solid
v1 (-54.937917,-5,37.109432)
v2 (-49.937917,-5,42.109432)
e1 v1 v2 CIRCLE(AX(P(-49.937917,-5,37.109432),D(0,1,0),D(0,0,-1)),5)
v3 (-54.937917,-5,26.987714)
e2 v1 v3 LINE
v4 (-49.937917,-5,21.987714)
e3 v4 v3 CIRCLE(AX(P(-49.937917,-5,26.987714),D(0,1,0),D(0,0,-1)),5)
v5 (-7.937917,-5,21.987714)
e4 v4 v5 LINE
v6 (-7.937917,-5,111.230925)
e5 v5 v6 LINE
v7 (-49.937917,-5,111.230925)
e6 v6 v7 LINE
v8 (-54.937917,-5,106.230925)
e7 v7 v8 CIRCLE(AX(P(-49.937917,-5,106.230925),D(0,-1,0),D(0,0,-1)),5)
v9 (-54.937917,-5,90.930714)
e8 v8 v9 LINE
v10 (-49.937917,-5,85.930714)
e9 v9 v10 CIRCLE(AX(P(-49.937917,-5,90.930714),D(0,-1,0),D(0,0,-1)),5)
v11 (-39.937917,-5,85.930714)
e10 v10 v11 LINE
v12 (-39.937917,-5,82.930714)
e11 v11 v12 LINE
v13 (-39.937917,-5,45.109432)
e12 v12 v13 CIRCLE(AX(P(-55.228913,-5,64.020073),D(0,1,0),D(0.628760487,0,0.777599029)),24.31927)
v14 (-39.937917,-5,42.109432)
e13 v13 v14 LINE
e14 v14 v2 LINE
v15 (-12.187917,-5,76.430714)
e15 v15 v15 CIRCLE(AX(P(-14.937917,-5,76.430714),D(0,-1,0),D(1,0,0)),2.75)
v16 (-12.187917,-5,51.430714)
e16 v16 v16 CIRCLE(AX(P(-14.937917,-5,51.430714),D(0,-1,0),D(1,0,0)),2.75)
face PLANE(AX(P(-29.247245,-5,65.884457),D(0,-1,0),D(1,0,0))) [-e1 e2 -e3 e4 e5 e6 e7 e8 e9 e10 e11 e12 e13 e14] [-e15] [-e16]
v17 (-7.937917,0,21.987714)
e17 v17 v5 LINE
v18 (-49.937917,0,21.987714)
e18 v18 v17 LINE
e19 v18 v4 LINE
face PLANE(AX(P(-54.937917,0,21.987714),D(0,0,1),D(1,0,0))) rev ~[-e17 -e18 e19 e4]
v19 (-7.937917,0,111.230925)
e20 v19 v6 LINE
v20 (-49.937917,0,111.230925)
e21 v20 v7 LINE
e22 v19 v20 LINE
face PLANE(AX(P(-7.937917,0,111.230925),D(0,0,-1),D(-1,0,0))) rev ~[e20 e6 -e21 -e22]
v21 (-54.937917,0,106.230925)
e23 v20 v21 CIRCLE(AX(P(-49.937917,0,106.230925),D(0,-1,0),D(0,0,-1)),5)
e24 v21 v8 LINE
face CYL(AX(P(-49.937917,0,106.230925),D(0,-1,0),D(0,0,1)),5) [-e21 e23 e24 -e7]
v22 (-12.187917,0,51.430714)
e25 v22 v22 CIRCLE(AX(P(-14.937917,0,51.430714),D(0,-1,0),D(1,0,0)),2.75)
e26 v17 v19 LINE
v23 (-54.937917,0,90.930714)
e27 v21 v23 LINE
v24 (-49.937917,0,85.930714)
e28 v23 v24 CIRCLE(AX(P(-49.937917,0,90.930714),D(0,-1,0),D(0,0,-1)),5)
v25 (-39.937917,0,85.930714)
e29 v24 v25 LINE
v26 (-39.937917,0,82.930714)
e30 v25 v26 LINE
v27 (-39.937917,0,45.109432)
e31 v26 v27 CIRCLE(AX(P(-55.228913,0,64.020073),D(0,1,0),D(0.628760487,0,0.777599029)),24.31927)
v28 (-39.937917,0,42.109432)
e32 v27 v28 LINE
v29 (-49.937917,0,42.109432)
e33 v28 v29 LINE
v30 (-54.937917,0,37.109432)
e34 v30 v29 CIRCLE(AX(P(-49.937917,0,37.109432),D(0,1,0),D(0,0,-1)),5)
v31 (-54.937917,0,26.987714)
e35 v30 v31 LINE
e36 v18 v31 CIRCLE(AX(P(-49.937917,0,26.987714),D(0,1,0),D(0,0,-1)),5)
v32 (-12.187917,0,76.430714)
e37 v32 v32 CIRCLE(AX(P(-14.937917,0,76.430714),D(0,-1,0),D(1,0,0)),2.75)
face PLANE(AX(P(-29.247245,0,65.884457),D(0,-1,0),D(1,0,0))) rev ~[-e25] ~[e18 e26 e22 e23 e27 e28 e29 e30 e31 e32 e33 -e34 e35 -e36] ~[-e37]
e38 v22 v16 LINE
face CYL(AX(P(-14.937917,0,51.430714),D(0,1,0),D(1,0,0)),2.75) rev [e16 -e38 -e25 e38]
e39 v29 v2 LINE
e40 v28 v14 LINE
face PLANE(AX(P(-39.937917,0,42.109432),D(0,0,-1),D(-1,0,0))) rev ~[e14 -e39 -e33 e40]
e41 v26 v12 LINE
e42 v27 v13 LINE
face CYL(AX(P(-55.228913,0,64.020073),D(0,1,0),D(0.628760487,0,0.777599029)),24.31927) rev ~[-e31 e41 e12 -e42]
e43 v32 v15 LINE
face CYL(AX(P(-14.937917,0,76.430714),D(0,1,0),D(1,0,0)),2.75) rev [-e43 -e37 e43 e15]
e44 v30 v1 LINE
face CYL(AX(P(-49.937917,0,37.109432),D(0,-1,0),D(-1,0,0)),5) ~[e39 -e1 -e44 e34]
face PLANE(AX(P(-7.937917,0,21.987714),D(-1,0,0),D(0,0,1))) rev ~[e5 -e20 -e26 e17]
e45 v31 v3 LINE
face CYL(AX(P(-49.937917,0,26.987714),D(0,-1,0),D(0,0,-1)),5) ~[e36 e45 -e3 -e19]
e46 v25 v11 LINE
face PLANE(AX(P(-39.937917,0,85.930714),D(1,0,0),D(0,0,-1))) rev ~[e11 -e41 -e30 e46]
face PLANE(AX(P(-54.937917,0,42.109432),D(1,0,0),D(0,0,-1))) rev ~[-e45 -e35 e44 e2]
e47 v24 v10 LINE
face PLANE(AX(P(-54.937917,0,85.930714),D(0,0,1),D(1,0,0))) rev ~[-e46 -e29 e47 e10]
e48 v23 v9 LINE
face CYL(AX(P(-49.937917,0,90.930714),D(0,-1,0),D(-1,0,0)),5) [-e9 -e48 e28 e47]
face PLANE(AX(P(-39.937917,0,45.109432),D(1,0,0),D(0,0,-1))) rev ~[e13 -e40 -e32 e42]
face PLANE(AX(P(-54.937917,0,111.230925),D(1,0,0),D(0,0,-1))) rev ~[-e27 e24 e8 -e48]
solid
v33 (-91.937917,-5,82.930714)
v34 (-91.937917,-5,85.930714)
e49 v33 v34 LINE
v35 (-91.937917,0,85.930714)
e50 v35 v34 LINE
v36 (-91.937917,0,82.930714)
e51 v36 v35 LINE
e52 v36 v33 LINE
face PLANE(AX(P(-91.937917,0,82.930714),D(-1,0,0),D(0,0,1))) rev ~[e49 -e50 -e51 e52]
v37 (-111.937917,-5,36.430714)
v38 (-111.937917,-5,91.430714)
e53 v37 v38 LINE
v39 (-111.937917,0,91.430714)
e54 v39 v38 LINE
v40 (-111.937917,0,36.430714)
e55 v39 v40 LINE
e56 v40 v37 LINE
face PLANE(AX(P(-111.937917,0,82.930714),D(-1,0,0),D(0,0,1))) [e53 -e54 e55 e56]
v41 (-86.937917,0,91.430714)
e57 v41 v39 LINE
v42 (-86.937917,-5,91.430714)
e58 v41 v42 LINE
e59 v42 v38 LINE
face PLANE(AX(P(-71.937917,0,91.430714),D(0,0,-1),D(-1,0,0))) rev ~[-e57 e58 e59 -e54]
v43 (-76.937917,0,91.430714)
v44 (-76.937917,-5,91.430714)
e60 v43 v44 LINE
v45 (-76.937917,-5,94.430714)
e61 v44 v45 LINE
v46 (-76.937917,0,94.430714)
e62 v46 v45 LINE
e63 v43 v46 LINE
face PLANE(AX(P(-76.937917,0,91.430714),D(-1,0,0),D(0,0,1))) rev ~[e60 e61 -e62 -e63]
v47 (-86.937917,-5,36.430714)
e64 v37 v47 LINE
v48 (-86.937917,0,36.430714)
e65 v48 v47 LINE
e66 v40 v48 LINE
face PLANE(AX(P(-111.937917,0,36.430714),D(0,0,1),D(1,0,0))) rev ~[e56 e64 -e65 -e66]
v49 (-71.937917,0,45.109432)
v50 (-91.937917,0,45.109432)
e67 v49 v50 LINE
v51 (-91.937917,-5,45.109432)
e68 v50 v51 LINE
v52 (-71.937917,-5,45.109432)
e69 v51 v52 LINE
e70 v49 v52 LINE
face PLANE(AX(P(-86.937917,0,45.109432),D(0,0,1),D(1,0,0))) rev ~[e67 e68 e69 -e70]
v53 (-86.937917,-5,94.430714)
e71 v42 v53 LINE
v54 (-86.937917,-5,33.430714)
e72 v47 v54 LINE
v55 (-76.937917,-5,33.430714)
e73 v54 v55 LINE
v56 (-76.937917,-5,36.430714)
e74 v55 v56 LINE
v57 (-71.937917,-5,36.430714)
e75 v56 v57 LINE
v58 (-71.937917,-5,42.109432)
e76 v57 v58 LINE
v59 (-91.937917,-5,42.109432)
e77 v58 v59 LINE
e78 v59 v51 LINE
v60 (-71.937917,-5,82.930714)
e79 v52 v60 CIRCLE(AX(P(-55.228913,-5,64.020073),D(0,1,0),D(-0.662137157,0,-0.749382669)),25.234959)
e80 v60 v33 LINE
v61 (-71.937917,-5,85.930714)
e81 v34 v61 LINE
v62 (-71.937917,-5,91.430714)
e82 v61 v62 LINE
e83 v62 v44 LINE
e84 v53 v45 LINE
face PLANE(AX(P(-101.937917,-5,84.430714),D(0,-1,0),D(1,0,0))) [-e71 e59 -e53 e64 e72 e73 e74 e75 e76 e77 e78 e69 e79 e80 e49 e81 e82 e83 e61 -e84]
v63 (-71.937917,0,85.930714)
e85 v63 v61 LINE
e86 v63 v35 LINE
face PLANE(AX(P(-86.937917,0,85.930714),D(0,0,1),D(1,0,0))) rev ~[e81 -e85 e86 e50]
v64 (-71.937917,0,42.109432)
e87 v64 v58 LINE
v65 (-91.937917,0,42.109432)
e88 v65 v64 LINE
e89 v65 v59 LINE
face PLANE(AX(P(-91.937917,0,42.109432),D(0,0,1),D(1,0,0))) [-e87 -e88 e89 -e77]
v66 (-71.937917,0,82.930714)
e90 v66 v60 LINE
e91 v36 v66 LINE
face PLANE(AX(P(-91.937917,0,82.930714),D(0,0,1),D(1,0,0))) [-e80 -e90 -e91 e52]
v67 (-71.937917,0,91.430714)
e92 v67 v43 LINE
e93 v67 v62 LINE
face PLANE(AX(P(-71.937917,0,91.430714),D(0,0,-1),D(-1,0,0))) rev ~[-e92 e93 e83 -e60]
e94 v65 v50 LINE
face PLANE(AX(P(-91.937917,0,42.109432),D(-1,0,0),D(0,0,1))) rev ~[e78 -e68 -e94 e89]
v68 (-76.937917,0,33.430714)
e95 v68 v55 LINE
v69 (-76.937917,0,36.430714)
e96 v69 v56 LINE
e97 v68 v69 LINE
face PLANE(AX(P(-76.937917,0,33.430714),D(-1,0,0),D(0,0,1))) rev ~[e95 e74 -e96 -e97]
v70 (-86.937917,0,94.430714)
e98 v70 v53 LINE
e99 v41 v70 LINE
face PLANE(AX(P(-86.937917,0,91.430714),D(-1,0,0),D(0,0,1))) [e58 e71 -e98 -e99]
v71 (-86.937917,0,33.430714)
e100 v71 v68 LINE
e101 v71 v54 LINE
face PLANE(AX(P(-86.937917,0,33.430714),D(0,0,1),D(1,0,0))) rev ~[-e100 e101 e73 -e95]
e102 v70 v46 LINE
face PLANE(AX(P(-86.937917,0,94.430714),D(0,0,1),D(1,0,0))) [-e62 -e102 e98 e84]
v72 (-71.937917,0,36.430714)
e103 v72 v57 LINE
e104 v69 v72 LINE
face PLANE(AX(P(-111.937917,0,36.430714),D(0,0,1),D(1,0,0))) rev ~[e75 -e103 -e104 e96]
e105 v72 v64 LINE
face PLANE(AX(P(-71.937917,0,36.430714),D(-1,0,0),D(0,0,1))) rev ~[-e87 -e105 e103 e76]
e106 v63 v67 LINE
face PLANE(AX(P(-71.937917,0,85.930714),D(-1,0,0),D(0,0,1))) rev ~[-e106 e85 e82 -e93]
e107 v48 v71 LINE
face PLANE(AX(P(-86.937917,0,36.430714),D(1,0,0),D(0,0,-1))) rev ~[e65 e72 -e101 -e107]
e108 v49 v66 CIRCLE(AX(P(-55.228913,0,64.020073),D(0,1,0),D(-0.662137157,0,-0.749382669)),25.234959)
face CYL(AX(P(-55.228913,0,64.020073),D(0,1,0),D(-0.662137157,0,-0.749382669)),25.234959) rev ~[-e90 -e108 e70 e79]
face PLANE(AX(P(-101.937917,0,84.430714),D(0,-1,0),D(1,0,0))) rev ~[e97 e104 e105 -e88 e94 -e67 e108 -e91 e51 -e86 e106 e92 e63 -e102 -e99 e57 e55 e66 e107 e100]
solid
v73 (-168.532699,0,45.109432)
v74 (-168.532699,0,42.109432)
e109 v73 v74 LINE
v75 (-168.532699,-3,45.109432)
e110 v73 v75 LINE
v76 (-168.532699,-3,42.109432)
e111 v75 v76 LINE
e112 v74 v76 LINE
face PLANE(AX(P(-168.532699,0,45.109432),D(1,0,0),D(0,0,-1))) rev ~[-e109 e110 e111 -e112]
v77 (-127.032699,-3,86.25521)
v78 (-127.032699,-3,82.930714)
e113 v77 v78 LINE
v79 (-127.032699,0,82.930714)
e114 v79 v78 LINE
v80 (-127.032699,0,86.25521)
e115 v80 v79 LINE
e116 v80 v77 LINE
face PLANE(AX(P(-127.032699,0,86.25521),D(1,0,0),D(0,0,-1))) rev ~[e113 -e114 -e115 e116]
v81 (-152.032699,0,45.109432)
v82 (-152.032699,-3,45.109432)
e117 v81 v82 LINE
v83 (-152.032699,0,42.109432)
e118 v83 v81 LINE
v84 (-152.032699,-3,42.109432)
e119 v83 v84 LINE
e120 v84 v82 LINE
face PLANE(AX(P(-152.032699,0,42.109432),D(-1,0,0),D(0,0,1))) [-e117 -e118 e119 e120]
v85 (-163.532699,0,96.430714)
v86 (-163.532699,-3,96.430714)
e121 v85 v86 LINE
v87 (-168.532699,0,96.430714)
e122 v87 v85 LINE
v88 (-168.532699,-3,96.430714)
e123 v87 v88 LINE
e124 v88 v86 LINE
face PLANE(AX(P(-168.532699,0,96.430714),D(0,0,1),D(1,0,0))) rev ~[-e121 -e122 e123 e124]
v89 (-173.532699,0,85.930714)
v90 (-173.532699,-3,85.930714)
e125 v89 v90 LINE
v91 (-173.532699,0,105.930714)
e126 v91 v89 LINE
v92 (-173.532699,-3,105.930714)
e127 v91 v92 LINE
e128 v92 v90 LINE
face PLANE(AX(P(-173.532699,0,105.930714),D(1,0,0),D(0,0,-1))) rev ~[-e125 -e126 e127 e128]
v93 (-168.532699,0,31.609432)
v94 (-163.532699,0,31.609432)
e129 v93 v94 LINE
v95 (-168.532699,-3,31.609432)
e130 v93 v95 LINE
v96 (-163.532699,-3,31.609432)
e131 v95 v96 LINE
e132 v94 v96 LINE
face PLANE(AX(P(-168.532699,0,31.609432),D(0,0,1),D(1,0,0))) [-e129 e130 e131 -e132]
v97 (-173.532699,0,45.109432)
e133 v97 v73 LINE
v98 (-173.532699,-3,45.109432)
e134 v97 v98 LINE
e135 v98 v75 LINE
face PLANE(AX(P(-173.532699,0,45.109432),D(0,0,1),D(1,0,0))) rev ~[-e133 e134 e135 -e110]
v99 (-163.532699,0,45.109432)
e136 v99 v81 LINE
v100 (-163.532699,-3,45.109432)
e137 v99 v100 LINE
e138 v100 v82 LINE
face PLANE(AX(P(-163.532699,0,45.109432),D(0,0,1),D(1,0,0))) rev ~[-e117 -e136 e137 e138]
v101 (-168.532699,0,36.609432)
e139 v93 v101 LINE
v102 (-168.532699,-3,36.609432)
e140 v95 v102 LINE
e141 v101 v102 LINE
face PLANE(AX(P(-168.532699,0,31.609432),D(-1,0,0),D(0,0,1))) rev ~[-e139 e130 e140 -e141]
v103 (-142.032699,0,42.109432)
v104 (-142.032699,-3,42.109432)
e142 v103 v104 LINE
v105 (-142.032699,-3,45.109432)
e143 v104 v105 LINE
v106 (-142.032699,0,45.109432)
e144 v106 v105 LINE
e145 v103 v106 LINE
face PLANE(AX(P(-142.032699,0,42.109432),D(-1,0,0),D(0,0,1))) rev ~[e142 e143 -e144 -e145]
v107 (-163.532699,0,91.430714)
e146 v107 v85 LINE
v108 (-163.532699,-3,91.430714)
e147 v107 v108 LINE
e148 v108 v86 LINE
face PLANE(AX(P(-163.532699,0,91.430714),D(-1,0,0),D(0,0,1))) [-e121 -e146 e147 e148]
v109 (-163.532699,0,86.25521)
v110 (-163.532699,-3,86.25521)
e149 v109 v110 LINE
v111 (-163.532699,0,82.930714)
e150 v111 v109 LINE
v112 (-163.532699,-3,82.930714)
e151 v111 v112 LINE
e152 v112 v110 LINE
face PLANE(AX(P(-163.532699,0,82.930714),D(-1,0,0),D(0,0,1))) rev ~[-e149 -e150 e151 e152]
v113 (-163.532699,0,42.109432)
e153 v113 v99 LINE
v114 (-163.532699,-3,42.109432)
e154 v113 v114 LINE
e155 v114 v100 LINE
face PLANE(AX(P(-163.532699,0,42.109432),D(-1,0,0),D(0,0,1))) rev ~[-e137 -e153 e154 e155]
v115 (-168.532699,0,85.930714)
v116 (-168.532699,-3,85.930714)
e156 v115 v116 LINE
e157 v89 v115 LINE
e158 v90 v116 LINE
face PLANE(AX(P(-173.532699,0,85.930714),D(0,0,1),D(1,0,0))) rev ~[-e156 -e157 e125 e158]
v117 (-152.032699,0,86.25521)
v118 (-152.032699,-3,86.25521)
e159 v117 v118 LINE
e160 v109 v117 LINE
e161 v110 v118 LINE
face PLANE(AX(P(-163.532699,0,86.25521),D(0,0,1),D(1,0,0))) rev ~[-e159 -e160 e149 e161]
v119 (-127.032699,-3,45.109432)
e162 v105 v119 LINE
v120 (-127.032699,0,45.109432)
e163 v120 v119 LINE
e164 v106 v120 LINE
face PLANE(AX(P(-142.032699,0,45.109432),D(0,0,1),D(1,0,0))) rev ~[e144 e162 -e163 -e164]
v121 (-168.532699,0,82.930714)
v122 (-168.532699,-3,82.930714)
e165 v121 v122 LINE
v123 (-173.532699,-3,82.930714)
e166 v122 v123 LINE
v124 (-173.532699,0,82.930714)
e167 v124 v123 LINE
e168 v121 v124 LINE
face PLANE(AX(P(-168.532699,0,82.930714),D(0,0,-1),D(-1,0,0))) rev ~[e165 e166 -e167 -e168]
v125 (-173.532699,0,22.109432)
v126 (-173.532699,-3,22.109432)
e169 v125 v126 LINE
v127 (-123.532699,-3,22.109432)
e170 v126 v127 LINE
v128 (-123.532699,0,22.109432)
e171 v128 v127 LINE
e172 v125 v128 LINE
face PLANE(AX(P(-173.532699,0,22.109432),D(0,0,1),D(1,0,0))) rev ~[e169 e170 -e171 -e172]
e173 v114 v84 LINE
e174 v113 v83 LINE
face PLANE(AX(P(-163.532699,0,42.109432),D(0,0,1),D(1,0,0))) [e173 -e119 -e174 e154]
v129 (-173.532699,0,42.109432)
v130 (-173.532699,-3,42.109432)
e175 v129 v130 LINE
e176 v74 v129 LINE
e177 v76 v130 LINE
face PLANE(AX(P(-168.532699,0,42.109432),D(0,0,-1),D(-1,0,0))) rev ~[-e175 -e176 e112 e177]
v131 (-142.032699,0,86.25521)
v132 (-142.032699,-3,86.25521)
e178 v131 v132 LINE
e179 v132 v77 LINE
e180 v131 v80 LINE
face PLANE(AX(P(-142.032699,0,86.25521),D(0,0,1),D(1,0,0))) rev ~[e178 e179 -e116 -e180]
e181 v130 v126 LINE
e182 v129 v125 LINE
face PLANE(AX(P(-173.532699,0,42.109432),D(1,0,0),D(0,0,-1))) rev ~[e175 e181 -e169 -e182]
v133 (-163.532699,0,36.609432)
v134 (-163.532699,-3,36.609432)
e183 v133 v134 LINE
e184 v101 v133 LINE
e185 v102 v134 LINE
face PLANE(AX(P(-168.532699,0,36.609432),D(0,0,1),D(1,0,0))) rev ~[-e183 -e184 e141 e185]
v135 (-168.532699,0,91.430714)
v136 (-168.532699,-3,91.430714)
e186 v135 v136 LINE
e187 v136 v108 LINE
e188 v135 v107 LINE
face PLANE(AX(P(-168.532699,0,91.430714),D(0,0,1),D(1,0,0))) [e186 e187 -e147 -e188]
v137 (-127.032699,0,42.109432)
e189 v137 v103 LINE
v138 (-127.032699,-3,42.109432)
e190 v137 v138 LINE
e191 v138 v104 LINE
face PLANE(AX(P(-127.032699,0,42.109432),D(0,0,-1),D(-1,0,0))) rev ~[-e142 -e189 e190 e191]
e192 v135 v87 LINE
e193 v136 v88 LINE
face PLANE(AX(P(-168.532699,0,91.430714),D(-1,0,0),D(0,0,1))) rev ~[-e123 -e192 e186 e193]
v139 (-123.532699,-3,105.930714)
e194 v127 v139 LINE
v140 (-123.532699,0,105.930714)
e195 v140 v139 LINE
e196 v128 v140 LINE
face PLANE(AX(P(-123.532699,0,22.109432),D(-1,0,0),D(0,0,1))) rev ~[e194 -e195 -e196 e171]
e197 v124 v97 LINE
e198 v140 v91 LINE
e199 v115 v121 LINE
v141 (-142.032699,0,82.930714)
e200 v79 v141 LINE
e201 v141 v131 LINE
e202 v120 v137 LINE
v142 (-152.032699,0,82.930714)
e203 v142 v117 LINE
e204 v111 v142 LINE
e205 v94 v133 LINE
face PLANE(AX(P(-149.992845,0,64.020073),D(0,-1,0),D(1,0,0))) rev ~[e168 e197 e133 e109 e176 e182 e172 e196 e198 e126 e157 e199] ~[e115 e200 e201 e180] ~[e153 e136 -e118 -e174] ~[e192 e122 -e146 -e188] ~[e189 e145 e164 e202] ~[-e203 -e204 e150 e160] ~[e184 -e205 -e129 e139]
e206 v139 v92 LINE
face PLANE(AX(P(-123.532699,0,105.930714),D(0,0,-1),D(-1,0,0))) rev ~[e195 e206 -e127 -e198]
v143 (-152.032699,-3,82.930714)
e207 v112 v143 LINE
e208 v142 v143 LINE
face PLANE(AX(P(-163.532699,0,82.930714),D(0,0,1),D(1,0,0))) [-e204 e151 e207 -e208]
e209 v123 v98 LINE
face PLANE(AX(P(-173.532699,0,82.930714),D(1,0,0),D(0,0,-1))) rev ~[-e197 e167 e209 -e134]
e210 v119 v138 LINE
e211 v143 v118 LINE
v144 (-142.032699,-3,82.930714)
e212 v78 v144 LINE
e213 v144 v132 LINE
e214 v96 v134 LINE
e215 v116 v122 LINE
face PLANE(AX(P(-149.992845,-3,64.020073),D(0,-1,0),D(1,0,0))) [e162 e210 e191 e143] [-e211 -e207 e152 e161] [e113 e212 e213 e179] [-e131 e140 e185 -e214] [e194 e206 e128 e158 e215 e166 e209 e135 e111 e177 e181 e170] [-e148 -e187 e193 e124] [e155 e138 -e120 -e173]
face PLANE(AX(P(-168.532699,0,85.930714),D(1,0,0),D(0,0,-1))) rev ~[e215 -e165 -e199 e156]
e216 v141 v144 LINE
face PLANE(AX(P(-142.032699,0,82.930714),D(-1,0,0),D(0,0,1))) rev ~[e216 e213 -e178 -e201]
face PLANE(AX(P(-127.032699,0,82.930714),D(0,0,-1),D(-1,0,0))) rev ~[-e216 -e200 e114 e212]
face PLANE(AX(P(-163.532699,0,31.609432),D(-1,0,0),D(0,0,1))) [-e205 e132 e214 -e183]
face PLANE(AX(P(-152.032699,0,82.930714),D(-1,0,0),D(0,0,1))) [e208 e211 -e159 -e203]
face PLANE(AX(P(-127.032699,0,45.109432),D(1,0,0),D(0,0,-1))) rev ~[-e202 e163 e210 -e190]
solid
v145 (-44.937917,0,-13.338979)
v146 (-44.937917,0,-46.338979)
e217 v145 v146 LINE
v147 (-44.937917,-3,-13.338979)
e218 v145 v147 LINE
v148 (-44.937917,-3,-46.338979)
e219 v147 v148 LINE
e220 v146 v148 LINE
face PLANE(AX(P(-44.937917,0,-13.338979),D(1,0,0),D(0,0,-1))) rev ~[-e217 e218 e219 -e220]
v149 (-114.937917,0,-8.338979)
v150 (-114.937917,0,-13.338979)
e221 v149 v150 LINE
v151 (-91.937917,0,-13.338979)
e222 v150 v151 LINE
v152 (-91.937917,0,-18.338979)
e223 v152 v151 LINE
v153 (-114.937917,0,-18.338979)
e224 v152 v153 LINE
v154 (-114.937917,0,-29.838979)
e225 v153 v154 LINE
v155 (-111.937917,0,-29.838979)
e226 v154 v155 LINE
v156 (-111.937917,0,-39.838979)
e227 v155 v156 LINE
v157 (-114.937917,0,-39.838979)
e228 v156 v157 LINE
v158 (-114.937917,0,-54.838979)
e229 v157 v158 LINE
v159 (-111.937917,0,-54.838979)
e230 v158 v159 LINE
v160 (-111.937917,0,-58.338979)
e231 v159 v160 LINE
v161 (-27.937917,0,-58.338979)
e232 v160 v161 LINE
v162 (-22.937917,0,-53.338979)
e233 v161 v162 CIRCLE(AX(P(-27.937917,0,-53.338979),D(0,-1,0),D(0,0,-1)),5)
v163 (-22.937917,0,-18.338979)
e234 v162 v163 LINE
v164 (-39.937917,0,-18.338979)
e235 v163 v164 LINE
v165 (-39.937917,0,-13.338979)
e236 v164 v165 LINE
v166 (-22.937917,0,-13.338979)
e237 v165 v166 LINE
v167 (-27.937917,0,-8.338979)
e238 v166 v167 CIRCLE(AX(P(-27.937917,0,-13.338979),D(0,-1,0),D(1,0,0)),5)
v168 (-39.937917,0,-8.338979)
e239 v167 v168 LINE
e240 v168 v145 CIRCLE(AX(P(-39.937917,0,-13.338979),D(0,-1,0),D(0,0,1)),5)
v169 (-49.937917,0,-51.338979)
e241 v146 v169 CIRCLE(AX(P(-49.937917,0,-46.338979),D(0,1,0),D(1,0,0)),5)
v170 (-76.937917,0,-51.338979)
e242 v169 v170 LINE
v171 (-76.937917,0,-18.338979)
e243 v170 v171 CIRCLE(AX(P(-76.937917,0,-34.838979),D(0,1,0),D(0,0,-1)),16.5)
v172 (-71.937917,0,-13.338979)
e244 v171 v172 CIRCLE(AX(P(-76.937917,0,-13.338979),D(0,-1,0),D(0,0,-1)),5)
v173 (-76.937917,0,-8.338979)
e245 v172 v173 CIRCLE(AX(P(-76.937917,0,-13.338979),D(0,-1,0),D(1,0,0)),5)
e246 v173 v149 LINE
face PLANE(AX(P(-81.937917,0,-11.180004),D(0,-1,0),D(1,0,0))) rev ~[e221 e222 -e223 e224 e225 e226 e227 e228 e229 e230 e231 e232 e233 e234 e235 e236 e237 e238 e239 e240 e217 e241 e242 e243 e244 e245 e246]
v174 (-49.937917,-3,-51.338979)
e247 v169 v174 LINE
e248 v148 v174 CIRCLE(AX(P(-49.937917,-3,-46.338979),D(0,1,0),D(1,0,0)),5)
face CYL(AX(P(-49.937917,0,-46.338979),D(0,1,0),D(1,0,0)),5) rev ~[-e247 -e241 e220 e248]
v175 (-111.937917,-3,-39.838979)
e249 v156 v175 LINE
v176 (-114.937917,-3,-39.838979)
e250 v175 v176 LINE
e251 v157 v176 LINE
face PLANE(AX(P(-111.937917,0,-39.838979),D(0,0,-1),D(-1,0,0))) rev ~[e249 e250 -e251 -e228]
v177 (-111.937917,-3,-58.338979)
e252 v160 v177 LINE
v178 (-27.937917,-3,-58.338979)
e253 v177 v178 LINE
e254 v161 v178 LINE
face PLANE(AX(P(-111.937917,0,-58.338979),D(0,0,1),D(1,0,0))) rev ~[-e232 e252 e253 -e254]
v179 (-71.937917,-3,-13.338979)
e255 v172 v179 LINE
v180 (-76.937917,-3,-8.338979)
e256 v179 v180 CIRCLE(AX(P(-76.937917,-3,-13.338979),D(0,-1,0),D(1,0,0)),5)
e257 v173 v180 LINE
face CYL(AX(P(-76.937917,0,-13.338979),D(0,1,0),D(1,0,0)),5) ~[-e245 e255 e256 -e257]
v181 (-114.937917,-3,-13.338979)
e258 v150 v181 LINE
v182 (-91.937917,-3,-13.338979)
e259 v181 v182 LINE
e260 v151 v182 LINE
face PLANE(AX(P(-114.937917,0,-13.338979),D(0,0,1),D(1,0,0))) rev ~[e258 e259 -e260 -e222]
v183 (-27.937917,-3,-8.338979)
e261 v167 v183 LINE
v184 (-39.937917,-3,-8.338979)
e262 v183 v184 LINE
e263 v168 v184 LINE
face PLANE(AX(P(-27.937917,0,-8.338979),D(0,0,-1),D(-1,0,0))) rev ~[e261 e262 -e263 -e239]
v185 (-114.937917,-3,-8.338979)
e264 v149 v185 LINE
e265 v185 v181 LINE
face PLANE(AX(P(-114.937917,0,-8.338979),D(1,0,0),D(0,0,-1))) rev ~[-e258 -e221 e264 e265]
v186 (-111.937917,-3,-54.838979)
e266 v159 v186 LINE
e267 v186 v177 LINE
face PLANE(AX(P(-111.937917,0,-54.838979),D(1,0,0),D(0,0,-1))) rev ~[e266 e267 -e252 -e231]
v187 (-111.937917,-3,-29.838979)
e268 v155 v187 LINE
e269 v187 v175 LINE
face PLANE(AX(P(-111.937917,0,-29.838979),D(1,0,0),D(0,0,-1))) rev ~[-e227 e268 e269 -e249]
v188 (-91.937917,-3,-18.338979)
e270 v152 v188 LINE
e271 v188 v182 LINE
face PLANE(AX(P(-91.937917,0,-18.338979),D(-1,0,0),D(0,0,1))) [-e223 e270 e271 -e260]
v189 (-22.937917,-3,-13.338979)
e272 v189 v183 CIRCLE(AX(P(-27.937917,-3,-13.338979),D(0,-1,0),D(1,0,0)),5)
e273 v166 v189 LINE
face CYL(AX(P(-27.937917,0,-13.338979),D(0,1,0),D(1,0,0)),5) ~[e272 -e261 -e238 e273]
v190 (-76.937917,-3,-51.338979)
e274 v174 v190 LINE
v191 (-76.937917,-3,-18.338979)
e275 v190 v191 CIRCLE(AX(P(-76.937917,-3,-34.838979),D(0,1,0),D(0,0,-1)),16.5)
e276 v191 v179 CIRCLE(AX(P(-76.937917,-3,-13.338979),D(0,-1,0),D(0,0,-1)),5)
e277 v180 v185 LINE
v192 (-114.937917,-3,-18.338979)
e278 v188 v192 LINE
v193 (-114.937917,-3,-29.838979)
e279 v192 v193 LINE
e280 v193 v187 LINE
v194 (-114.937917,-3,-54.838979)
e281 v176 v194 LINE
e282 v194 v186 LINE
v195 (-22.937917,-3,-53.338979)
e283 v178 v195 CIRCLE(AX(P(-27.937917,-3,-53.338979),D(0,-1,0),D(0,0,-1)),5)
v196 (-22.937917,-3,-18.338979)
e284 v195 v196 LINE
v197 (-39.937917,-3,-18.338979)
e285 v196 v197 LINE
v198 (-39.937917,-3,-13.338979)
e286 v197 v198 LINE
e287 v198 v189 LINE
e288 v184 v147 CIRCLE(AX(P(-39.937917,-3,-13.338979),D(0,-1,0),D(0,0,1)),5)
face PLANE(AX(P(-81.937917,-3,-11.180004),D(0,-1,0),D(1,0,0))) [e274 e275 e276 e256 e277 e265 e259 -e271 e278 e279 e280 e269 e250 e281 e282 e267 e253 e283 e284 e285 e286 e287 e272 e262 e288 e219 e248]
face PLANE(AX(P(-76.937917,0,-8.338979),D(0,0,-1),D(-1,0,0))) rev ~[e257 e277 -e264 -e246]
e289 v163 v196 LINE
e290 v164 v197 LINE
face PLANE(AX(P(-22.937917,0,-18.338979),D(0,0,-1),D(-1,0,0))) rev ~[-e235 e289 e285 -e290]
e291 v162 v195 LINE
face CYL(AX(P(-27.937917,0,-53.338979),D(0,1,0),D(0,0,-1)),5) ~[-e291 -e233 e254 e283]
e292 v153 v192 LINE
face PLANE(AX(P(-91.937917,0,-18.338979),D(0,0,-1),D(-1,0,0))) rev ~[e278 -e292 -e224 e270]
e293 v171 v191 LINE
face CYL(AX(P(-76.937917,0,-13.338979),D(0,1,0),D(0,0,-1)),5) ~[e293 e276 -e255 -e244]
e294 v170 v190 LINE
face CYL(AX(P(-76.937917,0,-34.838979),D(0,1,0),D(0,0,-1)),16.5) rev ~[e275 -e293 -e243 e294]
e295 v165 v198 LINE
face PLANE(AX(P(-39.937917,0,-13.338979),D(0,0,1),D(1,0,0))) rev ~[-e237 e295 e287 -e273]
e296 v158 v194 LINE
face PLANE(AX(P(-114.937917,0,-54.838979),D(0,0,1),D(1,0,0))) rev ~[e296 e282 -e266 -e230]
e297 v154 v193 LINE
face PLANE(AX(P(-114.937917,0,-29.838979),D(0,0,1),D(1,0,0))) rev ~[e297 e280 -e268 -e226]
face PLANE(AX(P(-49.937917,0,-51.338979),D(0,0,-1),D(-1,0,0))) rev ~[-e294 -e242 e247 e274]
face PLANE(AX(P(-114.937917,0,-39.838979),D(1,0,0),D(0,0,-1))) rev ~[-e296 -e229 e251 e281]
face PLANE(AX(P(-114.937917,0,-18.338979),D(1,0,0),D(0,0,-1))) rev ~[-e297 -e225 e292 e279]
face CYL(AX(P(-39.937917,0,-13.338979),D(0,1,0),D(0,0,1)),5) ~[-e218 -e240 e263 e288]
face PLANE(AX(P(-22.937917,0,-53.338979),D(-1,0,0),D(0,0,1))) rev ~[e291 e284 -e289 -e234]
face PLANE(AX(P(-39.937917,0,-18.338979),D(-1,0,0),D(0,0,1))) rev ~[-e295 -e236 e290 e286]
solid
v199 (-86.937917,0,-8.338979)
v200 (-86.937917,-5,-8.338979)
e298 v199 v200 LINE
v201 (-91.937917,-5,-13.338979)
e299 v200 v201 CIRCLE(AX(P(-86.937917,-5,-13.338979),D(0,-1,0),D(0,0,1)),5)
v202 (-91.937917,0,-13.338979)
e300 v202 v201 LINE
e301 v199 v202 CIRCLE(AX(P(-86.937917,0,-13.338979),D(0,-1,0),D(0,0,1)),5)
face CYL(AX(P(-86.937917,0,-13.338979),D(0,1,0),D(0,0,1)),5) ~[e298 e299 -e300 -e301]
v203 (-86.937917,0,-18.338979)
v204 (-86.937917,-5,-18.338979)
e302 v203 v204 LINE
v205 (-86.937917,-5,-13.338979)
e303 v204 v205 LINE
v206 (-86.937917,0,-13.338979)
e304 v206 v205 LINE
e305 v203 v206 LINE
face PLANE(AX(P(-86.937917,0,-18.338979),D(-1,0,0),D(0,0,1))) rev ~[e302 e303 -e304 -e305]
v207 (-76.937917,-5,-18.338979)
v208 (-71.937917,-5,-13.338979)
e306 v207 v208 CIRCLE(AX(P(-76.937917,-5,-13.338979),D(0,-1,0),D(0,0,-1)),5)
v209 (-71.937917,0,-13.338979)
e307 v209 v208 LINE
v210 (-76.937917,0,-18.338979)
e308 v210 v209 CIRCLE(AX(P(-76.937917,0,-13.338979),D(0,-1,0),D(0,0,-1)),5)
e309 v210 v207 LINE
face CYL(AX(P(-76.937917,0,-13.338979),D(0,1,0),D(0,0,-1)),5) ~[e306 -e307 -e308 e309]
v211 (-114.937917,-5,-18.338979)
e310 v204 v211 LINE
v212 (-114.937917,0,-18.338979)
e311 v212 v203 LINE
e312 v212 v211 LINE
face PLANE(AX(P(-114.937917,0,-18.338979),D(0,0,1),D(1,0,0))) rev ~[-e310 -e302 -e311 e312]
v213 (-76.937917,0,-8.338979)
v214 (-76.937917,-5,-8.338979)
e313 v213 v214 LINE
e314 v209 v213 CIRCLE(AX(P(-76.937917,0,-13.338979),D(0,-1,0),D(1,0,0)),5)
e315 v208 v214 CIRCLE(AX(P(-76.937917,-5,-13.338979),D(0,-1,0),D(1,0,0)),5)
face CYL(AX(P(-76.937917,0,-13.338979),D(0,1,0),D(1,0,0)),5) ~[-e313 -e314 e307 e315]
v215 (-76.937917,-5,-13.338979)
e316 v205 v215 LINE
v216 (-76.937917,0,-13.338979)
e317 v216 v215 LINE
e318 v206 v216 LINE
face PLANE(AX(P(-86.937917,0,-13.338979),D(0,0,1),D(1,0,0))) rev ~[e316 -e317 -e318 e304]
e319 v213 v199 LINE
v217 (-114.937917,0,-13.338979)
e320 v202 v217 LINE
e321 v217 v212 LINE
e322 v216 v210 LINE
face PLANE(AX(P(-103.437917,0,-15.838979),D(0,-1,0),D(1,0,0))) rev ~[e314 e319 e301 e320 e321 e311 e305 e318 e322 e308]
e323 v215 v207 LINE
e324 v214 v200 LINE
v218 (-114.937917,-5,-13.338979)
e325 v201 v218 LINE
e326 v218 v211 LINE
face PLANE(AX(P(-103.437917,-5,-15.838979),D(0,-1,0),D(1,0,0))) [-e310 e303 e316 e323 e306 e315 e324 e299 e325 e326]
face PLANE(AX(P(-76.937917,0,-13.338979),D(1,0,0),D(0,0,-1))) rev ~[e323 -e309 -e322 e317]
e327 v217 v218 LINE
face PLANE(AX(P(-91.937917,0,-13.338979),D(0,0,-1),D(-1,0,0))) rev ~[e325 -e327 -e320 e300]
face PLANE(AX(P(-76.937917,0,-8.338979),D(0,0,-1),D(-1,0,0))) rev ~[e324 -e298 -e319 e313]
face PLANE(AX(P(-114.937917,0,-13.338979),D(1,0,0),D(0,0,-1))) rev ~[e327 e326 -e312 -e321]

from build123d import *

# Parameters (mm, degrees)
F0_W     = 10
F0_H     = 5
F0_W_2   = 5
F1_DEPTH = 3
F0_W_3   = 11.5
F0_H_2   = 3
F0_H_3   = 3.3244964182
F2_DEPTH = 3
F0_R     = 2.75
F0_W_4   = 17
F0_H_4   = 5.5
F0_H_5   = 5.6787184179
F3_DEPTH = 5
F4_DEPTH = 5
F5_DEPTH = 5
F0_W_5   = 20
F6_DEPTH = 5
F7_DEPTH = 5
F8_R     = 5


with BuildPart() as f1:
    # F0 (on Front) → F1 (new body)
    with BuildSketch(Plane.XZ):
        with BuildLine():
            Line((-76.9379170388, -8.3389794454), (-86.9379170388, -8.3389794454))
            ThreePointArc((-86.9379170388, -8.3389794454), (-90.4734509447, -9.8034455395), (-91.9379170388, -13.3389794454))
            Line((-91.9379170388, -13.3389794454), (-86.9379170388, -13.3389794454))
            Line((-86.9379170388, -13.3389794454), (-76.9379170388, -13.3389794454))
            Line((-76.9379170388, -13.3389794454), (-71.9379170388, -13.3389794454))
            ThreePointArc((-71.9379170388, -13.3389794454), (-73.4023831329, -9.8034455395), (-76.9379170388, -8.3389794454))
        make_face()
        with BuildLine():
            ThreePointArc((-91.9379170388, -13.3389794454), (-90.4734509447, -9.8034455395), (-86.9379170388, -8.3389794454))
            Line((-86.9379170388, -8.3389794454), (-114.9379170388, -8.3389794454))
            Line((-114.9379170388, -8.3389794454), (-114.9379170388, -13.3389794454))
            Line((-114.9379170388, -13.3389794454), (-91.9379170388, -13.3389794454))
        make_face()
        with Locations((-81.9379170388, -15.8389794454)):
            Rectangle(F0_W, F0_H)
        with BuildLine():
            Line((-86.9379170388, -18.3389794454), (-91.9379170388, -18.3389794454))
            Line((-91.9379170388, -18.3389794454), (-111.9379170388, -18.3389794454))
            Line((-111.9379170388, -18.3389794454), (-114.9379170388, -18.3389794454))
            Line((-114.9379170388, -18.3389794454), (-114.9379170388, -29.8389794454))
            Line((-114.9379170388, -29.8389794454), (-111.9379170388, -29.8389794454))
            Line((-111.9379170388, -29.8389794454), (-111.9379170388, -34.8389794454))
            Line((-111.9379170388, -34.8389794454), (-111.9379170388, -39.8389794454))
            Line((-111.9379170388, -39.8389794454), (-114.9379170388, -39.8389794454))
            Line((-114.9379170388, -39.8389794454), (-114.9379170388, -54.8389794454))
            Line((-114.9379170388, -54.8389794454), (-111.9379170388, -54.8389794454))
            Line((-111.9379170388, -54.8389794454), (-111.9379170388, -58.3389794454))
            Line((-111.9379170388, -58.3389794454), (-27.9379170388, -58.3389794454))
            ThreePointArc((-27.9379170388, -58.3389794454), (-24.4023831329, -56.8745133513), (-22.9379170388, -53.3389794454))
            Line((-22.9379170388, -53.3389794454), (-22.9379170388, -18.3389794454))
            Line((-22.9379170388, -18.3389794454), (-39.9379170388, -18.3389794454))
            Line((-39.9379170388, -18.3389794454), (-39.9379170388, -13.3389794454))
            Line((-39.9379170388, -13.3389794454), (-22.9379170388, -13.3389794454))
            ThreePointArc((-22.9379170388, -13.3389794454), (-24.4023831329, -9.8034455395), (-27.9379170388, -8.3389794454))
            Line((-27.9379170388, -8.3389794454), (-39.9379170388, -8.3389794454))
            ThreePointArc((-39.9379170388, -8.3389794454), (-43.4734509447, -9.8034455395), (-44.9379170388, -13.3389794454))
            Line((-44.9379170388, -13.3389794454), (-44.9379170388, -46.3389794454))
            ThreePointArc((-44.9379170388, -46.3389794454), (-46.4023831329, -49.8745133513), (-49.9379170388, -51.3389794454))
            Line((-49.9379170388, -51.3389794454), (-66.9379170388, -51.3389794454))
            Line((-66.9379170388, -51.3389794454), (-76.9379170388, -51.3389794454))
            ThreePointArc((-76.9379170388, -51.3389794454), (-93.4379170388, -34.8389794454), (-76.9379170388, -18.3389794454))
            Line((-76.9379170388, -18.3389794454), (-86.9379170388, -18.3389794454))
        make_face()
        with BuildLine():
            ThreePointArc((-76.9379170388, -18.3389794454), (-73.4023831329, -16.8745133513), (-71.9379170388, -13.3389794454))
            Line((-71.9379170388, -13.3389794454), (-76.9379170388, -13.3389794454))
            Line((-76.9379170388, -13.3389794454), (-76.9379170388, -18.3389794454))
        make_face()
        with Locations((-89.4379170388, -15.8389794454)):
            Rectangle(F0_W_2, F0_H)
    extrude(amount=F1_DEPTH)


with BuildPart() as f2:
    # F0 (on Front) → F2 (new body)
    with BuildSketch(Plane.XZ):
        Polygon((-123.5326989889, 42.1094321907), (-123.5326989889, 105.9307137728), (-172.0326989889, 105.9307137728), (-173.5326989889, 105.9307137728), (-173.5326989889, 85.9307137728), (-172.0326989889, 85.9307137728), (-168.5326989889, 85.9307137728), (-168.5326989889, 82.9307137728), (-172.0326989889, 82.9307137728), (-173.5326989889, 82.9307137728), (-173.5326989889, 45.1094321907), (-172.0326989889, 45.1094321907), (-168.5326989889, 45.1094321907), (-168.5326989889, 42.1094321907), (-172.0326989889, 42.1094321907), (-173.5326989889, 42.1094321907), (-173.5326989889, 22.1094321907), (-172.0326989889, 22.1094321907), (-125.9478926659, 22.1094321907), (-123.5326989889, 22.1094321907), align=None)
        with Locations((-166.0326989889, 34.1094321907)):
            Rectangle(F0_W_2, F0_H, mode=Mode.SUBTRACT)
        with Locations((-157.7826989889, 43.6094321907)):
            Rectangle(F0_W_3, F0_H_2, mode=Mode.SUBTRACT)
        Polygon((-127.0326989889, 42.1094321907), (-142.0326989889, 42.1094321907), (-142.0326989889, 45.1094321907), (-130.5326989889, 45.1094321907), (-127.0326989889, 45.1094321907), align=None, mode=Mode.SUBTRACT)
        with Locations((-157.7826989889, 84.5929619819)):
            Rectangle(F0_W_3, F0_H_3, mode=Mode.SUBTRACT)
        Polygon((-142.0326989889, 86.255210191), (-127.0326989889, 86.255210191), (-127.0326989889, 82.9307137728), (-130.5326989889, 82.9307137728), (-142.0326989889, 82.9307137728), align=None, mode=Mode.SUBTRACT)
        with Locations((-166.0326989889, 93.9307137728)):
            Rectangle(F0_W_2, F0_H, mode=Mode.SUBTRACT)
    extrude(amount=F2_DEPTH)


with BuildPart() as f3:
    # F0 (on Front) → F3 (new body)
    with BuildSketch(Plane.XZ):
        with BuildLine():
            Line((-7.9379170388, 31.4307137728), (-7.9379170388, 96.4307137728))
            Line((-7.9379170388, 96.4307137728), (-7.9379170388, 111.2309247255))
            Line((-7.9379170388, 111.2309247255), (-22.9379170388, 111.2309247255))
            Line((-22.9379170388, 111.2309247255), (-54.9379170388, 111.2309247255))
            Line((-54.9379170388, 111.2309247255), (-54.9379170388, 91.4307137728))
            Line((-54.9379170388, 91.4307137728), (-39.9379170388, 91.4307137728))
            Line((-39.9379170388, 91.4307137728), (-22.9379170388, 91.4307137728))
            Line((-22.9379170388, 91.4307137728), (-22.9379170388, 85.9307137728))
            Line((-22.9379170388, 85.9307137728), (-22.9379170388, 82.9307137728))
            Line((-22.9379170388, 82.9307137728), (-39.9379170388, 82.9307137728))
            ThreePointArc((-39.9379170388, 82.9307137728), (-30.9096430701, 64.0200729817), (-39.9379170388, 45.1094321907))
            Line((-39.9379170388, 45.1094321907), (-22.9379170388, 45.1094321907))
            Line((-22.9379170388, 45.1094321907), (-22.9379170388, 42.1094321907))
            Line((-22.9379170388, 42.1094321907), (-22.9379170388, 36.4307137728))
            Line((-22.9379170388, 36.4307137728), (-39.9379170388, 36.4307137728))
            Line((-39.9379170388, 36.4307137728), (-54.9379170388, 36.4307137728))
            Line((-54.9379170388, 36.4307137728), (-54.9379170388, 21.9877138734))
            Line((-54.9379170388, 21.9877138734), (-22.9379170388, 21.9877138734))
            Line((-22.9379170388, 21.9877138734), (-7.9379170388, 21.9877138734))
            Line((-7.9379170388, 21.9877138734), (-7.9379170388, 31.4307137728))
        make_face()
        with Locations((-14.9379170388, 51.4307137728)):
            Circle(F0_R, mode=Mode.SUBTRACT)
        with Locations((-14.9379170388, 76.4307137728)):
            Circle(F0_R, mode=Mode.SUBTRACT)
        with Locations((-31.4379170388, 84.4307137728)):
            Rectangle(F0_W_4, F0_H_2)
        with Locations((-31.4379170388, 88.6807137728)):
            Rectangle(F0_W_4, F0_H_4)
        Polygon((-39.9379170388, 91.4307137728), (-54.9379170388, 91.4307137728), (-54.9379170388, 85.9307137728), (-44.9379170388, 85.9307137728), (-39.9379170388, 85.9307137728), align=None)
        with Locations((-31.4379170388, 43.6094321907)):
            Rectangle(F0_W_4, F0_H_2)
        with Locations((-31.4379170388, 39.2700729817)):
            Rectangle(F0_W_4, F0_H_5)
        Polygon((-54.9379170388, 42.1094321907), (-54.9379170388, 36.4307137728), (-39.9379170388, 36.4307137728), (-39.9379170388, 42.1094321907), (-44.9379170388, 42.1094321907), align=None)
    extrude(amount=F3_DEPTH)

    # F8
    f8_edges = [f3.edges().sort_by_distance(p)[0] for p in [
        (-54.937917, -2.5, 42.109432),
        (-54.937917, -2.5, 85.930714),
        (-54.937917, -2.5, 21.987714),
        (-54.937917, -2.5, 111.230925),
    ]]
    fillet(f8_edges, radius=F8_R)


with BuildPart() as f4:
    # F0 (on Front) → F4 (new body)
    with BuildSketch(Plane.XZ):
        Polygon((-86.9379170388, 85.9307137728), (-71.9379170388, 85.9307137728), (-71.9379170388, 91.4307137728), (-76.9379170388, 91.4307137728), (-86.9379170388, 91.4307137728), (-91.9379170388, 91.4307137728), (-111.9379170388, 91.4307137728), (-111.9379170388, 85.9307137728), (-91.9379170388, 85.9307137728), align=None)
        Polygon((-71.9379170388, 36.4307137728), (-71.9379170388, 42.1094321907), (-86.9379170388, 42.1094321907), (-91.9379170388, 42.1094321907), (-111.9379170388, 42.1094321907), (-111.9379170388, 36.4307137728), (-86.9379170388, 36.4307137728), (-76.9379170388, 36.4307137728), align=None)
        with Locations((-89.4379170388, 84.4307137728)):
            Rectangle(F0_W_2, F0_H_2)
        with BuildLine():
            ThreePointArc((-71.9379170388, 45.1094321907), (-80.4638719585, 64.0200729817), (-71.9379170388, 82.9307137728))
            Line((-71.9379170388, 82.9307137728), (-86.9379170388, 82.9307137728))
            Line((-86.9379170388, 82.9307137728), (-91.9379170388, 82.9307137728))
            Line((-91.9379170388, 82.9307137728), (-111.9379170388, 82.9307137728))
            Line((-111.9379170388, 82.9307137728), (-111.9379170388, 80.9307137728))
            Line((-111.9379170388, 80.9307137728), (-111.9379170388, 45.1094321907))
            Line((-111.9379170388, 45.1094321907), (-91.9379170388, 45.1094321907))
            Line((-91.9379170388, 45.1094321907), (-86.9379170388, 45.1094321907))
            Line((-86.9379170388, 45.1094321907), (-71.9379170388, 45.1094321907))
        make_face()
        with Locations((-89.4379170388, 43.6094321907)):
            Rectangle(F0_W_2, F0_H_2)
    extrude(amount=F4_DEPTH)

    # F0 (on Front) → F6 (join)
    with BuildSketch(Plane.XZ):
        Polygon((-76.9379170388, 33.4307137728), (-76.9379170388, 36.4307137728), (-86.9379170388, 36.4307137728), (-86.9379170388, 33.4307137728), (-78.4176960588, 33.4307137728), align=None)
        with Locations((-81.9379170388, 92.9307137728)):
            Rectangle(F0_W, F0_H_2)
        with Locations((-101.9379170388, 84.4307137728)):
            Rectangle(F0_W_5, F0_H_2)
        with Locations((-101.9379170388, 43.6094321907)):
            Rectangle(F0_W_5, F0_H_2)
        with Locations((-89.4379170388, 84.4307137728)):
            Rectangle(F0_W_2, F0_H_2)
        with Locations((-89.4379170388, 43.6094321907)):
            Rectangle(F0_W_2, F0_H_2)
    extrude(amount=F6_DEPTH)

    # F0 (on Front) → F7 (cut)
    with BuildSketch(Plane.XZ):
        with Locations((-89.4379170388, 84.4307137728)):
            Rectangle(F0_W_2, F0_H_2)
        with Locations((-89.4379170388, 43.6094321907)):
            Rectangle(F0_W_2, F0_H_2)
    extrude(amount=F7_DEPTH, mode=Mode.SUBTRACT)


with BuildPart() as f4b:
    # F0 (on Front) → F4, piece 2 (new body)
    with BuildSketch(Plane.XZ):
        with BuildLine():
            Line((-76.9379170388, -8.3389794454), (-86.9379170388, -8.3389794454))
            ThreePointArc((-86.9379170388, -8.3389794454), (-90.4734509447, -9.8034455395), (-91.9379170388, -13.3389794454))
            Line((-91.9379170388, -13.3389794454), (-86.9379170388, -13.3389794454))
            Line((-86.9379170388, -13.3389794454), (-76.9379170388, -13.3389794454))
            Line((-76.9379170388, -13.3389794454), (-71.9379170388, -13.3389794454))
            ThreePointArc((-71.9379170388, -13.3389794454), (-73.4023831329, -9.8034455395), (-76.9379170388, -8.3389794454))
        make_face()
    extrude(amount=F4_DEPTH)

    # F0 (on Front) → F4, piece 3 (join)
    with BuildSketch(Plane.XZ):
        Polygon((-91.9379170388, -18.3389794454), (-91.9379170388, -13.3389794454), (-114.9379170388, -13.3389794454), (-114.9379170388, -18.3389794454), (-111.9379170388, -18.3389794454), align=None)
    extrude(amount=F4_DEPTH)

    # F0 (on Front) → F5 (join)
    with BuildSketch(Plane.XZ):
        Polygon((-91.9379170388, -18.3389794454), (-91.9379170388, -13.3389794454), (-114.9379170388, -13.3389794454), (-114.9379170388, -18.3389794454), (-111.9379170388, -18.3389794454), align=None)
        with Locations((-89.4379170388, -15.8389794454)):
            Rectangle(F0_W_2, F0_H)
        with BuildLine():
            Line((-76.9379170388, -8.3389794454), (-86.9379170388, -8.3389794454))
            ThreePointArc((-86.9379170388, -8.3389794454), (-90.4734509447, -9.8034455395), (-91.9379170388, -13.3389794454))
            Line((-91.9379170388, -13.3389794454), (-86.9379170388, -13.3389794454))
            Line((-86.9379170388, -13.3389794454), (-76.9379170388, -13.3389794454))
            Line((-76.9379170388, -13.3389794454), (-71.9379170388, -13.3389794454))
            ThreePointArc((-71.9379170388, -13.3389794454), (-73.4023831329, -9.8034455395), (-76.9379170388, -8.3389794454))
        make_face()
        with BuildLine():
            ThreePointArc((-76.9379170388, -18.3389794454), (-73.4023831329, -16.8745133513), (-71.9379170388, -13.3389794454))
            Line((-71.9379170388, -13.3389794454), (-76.9379170388, -13.3389794454))
            Line((-76.9379170388, -13.3389794454), (-76.9379170388, -18.3389794454))
        make_face()
    extrude(amount=F5_DEPTH)


solid = Compound([f1.part, f2.part, f3.part, f4.part, f4b.part])
